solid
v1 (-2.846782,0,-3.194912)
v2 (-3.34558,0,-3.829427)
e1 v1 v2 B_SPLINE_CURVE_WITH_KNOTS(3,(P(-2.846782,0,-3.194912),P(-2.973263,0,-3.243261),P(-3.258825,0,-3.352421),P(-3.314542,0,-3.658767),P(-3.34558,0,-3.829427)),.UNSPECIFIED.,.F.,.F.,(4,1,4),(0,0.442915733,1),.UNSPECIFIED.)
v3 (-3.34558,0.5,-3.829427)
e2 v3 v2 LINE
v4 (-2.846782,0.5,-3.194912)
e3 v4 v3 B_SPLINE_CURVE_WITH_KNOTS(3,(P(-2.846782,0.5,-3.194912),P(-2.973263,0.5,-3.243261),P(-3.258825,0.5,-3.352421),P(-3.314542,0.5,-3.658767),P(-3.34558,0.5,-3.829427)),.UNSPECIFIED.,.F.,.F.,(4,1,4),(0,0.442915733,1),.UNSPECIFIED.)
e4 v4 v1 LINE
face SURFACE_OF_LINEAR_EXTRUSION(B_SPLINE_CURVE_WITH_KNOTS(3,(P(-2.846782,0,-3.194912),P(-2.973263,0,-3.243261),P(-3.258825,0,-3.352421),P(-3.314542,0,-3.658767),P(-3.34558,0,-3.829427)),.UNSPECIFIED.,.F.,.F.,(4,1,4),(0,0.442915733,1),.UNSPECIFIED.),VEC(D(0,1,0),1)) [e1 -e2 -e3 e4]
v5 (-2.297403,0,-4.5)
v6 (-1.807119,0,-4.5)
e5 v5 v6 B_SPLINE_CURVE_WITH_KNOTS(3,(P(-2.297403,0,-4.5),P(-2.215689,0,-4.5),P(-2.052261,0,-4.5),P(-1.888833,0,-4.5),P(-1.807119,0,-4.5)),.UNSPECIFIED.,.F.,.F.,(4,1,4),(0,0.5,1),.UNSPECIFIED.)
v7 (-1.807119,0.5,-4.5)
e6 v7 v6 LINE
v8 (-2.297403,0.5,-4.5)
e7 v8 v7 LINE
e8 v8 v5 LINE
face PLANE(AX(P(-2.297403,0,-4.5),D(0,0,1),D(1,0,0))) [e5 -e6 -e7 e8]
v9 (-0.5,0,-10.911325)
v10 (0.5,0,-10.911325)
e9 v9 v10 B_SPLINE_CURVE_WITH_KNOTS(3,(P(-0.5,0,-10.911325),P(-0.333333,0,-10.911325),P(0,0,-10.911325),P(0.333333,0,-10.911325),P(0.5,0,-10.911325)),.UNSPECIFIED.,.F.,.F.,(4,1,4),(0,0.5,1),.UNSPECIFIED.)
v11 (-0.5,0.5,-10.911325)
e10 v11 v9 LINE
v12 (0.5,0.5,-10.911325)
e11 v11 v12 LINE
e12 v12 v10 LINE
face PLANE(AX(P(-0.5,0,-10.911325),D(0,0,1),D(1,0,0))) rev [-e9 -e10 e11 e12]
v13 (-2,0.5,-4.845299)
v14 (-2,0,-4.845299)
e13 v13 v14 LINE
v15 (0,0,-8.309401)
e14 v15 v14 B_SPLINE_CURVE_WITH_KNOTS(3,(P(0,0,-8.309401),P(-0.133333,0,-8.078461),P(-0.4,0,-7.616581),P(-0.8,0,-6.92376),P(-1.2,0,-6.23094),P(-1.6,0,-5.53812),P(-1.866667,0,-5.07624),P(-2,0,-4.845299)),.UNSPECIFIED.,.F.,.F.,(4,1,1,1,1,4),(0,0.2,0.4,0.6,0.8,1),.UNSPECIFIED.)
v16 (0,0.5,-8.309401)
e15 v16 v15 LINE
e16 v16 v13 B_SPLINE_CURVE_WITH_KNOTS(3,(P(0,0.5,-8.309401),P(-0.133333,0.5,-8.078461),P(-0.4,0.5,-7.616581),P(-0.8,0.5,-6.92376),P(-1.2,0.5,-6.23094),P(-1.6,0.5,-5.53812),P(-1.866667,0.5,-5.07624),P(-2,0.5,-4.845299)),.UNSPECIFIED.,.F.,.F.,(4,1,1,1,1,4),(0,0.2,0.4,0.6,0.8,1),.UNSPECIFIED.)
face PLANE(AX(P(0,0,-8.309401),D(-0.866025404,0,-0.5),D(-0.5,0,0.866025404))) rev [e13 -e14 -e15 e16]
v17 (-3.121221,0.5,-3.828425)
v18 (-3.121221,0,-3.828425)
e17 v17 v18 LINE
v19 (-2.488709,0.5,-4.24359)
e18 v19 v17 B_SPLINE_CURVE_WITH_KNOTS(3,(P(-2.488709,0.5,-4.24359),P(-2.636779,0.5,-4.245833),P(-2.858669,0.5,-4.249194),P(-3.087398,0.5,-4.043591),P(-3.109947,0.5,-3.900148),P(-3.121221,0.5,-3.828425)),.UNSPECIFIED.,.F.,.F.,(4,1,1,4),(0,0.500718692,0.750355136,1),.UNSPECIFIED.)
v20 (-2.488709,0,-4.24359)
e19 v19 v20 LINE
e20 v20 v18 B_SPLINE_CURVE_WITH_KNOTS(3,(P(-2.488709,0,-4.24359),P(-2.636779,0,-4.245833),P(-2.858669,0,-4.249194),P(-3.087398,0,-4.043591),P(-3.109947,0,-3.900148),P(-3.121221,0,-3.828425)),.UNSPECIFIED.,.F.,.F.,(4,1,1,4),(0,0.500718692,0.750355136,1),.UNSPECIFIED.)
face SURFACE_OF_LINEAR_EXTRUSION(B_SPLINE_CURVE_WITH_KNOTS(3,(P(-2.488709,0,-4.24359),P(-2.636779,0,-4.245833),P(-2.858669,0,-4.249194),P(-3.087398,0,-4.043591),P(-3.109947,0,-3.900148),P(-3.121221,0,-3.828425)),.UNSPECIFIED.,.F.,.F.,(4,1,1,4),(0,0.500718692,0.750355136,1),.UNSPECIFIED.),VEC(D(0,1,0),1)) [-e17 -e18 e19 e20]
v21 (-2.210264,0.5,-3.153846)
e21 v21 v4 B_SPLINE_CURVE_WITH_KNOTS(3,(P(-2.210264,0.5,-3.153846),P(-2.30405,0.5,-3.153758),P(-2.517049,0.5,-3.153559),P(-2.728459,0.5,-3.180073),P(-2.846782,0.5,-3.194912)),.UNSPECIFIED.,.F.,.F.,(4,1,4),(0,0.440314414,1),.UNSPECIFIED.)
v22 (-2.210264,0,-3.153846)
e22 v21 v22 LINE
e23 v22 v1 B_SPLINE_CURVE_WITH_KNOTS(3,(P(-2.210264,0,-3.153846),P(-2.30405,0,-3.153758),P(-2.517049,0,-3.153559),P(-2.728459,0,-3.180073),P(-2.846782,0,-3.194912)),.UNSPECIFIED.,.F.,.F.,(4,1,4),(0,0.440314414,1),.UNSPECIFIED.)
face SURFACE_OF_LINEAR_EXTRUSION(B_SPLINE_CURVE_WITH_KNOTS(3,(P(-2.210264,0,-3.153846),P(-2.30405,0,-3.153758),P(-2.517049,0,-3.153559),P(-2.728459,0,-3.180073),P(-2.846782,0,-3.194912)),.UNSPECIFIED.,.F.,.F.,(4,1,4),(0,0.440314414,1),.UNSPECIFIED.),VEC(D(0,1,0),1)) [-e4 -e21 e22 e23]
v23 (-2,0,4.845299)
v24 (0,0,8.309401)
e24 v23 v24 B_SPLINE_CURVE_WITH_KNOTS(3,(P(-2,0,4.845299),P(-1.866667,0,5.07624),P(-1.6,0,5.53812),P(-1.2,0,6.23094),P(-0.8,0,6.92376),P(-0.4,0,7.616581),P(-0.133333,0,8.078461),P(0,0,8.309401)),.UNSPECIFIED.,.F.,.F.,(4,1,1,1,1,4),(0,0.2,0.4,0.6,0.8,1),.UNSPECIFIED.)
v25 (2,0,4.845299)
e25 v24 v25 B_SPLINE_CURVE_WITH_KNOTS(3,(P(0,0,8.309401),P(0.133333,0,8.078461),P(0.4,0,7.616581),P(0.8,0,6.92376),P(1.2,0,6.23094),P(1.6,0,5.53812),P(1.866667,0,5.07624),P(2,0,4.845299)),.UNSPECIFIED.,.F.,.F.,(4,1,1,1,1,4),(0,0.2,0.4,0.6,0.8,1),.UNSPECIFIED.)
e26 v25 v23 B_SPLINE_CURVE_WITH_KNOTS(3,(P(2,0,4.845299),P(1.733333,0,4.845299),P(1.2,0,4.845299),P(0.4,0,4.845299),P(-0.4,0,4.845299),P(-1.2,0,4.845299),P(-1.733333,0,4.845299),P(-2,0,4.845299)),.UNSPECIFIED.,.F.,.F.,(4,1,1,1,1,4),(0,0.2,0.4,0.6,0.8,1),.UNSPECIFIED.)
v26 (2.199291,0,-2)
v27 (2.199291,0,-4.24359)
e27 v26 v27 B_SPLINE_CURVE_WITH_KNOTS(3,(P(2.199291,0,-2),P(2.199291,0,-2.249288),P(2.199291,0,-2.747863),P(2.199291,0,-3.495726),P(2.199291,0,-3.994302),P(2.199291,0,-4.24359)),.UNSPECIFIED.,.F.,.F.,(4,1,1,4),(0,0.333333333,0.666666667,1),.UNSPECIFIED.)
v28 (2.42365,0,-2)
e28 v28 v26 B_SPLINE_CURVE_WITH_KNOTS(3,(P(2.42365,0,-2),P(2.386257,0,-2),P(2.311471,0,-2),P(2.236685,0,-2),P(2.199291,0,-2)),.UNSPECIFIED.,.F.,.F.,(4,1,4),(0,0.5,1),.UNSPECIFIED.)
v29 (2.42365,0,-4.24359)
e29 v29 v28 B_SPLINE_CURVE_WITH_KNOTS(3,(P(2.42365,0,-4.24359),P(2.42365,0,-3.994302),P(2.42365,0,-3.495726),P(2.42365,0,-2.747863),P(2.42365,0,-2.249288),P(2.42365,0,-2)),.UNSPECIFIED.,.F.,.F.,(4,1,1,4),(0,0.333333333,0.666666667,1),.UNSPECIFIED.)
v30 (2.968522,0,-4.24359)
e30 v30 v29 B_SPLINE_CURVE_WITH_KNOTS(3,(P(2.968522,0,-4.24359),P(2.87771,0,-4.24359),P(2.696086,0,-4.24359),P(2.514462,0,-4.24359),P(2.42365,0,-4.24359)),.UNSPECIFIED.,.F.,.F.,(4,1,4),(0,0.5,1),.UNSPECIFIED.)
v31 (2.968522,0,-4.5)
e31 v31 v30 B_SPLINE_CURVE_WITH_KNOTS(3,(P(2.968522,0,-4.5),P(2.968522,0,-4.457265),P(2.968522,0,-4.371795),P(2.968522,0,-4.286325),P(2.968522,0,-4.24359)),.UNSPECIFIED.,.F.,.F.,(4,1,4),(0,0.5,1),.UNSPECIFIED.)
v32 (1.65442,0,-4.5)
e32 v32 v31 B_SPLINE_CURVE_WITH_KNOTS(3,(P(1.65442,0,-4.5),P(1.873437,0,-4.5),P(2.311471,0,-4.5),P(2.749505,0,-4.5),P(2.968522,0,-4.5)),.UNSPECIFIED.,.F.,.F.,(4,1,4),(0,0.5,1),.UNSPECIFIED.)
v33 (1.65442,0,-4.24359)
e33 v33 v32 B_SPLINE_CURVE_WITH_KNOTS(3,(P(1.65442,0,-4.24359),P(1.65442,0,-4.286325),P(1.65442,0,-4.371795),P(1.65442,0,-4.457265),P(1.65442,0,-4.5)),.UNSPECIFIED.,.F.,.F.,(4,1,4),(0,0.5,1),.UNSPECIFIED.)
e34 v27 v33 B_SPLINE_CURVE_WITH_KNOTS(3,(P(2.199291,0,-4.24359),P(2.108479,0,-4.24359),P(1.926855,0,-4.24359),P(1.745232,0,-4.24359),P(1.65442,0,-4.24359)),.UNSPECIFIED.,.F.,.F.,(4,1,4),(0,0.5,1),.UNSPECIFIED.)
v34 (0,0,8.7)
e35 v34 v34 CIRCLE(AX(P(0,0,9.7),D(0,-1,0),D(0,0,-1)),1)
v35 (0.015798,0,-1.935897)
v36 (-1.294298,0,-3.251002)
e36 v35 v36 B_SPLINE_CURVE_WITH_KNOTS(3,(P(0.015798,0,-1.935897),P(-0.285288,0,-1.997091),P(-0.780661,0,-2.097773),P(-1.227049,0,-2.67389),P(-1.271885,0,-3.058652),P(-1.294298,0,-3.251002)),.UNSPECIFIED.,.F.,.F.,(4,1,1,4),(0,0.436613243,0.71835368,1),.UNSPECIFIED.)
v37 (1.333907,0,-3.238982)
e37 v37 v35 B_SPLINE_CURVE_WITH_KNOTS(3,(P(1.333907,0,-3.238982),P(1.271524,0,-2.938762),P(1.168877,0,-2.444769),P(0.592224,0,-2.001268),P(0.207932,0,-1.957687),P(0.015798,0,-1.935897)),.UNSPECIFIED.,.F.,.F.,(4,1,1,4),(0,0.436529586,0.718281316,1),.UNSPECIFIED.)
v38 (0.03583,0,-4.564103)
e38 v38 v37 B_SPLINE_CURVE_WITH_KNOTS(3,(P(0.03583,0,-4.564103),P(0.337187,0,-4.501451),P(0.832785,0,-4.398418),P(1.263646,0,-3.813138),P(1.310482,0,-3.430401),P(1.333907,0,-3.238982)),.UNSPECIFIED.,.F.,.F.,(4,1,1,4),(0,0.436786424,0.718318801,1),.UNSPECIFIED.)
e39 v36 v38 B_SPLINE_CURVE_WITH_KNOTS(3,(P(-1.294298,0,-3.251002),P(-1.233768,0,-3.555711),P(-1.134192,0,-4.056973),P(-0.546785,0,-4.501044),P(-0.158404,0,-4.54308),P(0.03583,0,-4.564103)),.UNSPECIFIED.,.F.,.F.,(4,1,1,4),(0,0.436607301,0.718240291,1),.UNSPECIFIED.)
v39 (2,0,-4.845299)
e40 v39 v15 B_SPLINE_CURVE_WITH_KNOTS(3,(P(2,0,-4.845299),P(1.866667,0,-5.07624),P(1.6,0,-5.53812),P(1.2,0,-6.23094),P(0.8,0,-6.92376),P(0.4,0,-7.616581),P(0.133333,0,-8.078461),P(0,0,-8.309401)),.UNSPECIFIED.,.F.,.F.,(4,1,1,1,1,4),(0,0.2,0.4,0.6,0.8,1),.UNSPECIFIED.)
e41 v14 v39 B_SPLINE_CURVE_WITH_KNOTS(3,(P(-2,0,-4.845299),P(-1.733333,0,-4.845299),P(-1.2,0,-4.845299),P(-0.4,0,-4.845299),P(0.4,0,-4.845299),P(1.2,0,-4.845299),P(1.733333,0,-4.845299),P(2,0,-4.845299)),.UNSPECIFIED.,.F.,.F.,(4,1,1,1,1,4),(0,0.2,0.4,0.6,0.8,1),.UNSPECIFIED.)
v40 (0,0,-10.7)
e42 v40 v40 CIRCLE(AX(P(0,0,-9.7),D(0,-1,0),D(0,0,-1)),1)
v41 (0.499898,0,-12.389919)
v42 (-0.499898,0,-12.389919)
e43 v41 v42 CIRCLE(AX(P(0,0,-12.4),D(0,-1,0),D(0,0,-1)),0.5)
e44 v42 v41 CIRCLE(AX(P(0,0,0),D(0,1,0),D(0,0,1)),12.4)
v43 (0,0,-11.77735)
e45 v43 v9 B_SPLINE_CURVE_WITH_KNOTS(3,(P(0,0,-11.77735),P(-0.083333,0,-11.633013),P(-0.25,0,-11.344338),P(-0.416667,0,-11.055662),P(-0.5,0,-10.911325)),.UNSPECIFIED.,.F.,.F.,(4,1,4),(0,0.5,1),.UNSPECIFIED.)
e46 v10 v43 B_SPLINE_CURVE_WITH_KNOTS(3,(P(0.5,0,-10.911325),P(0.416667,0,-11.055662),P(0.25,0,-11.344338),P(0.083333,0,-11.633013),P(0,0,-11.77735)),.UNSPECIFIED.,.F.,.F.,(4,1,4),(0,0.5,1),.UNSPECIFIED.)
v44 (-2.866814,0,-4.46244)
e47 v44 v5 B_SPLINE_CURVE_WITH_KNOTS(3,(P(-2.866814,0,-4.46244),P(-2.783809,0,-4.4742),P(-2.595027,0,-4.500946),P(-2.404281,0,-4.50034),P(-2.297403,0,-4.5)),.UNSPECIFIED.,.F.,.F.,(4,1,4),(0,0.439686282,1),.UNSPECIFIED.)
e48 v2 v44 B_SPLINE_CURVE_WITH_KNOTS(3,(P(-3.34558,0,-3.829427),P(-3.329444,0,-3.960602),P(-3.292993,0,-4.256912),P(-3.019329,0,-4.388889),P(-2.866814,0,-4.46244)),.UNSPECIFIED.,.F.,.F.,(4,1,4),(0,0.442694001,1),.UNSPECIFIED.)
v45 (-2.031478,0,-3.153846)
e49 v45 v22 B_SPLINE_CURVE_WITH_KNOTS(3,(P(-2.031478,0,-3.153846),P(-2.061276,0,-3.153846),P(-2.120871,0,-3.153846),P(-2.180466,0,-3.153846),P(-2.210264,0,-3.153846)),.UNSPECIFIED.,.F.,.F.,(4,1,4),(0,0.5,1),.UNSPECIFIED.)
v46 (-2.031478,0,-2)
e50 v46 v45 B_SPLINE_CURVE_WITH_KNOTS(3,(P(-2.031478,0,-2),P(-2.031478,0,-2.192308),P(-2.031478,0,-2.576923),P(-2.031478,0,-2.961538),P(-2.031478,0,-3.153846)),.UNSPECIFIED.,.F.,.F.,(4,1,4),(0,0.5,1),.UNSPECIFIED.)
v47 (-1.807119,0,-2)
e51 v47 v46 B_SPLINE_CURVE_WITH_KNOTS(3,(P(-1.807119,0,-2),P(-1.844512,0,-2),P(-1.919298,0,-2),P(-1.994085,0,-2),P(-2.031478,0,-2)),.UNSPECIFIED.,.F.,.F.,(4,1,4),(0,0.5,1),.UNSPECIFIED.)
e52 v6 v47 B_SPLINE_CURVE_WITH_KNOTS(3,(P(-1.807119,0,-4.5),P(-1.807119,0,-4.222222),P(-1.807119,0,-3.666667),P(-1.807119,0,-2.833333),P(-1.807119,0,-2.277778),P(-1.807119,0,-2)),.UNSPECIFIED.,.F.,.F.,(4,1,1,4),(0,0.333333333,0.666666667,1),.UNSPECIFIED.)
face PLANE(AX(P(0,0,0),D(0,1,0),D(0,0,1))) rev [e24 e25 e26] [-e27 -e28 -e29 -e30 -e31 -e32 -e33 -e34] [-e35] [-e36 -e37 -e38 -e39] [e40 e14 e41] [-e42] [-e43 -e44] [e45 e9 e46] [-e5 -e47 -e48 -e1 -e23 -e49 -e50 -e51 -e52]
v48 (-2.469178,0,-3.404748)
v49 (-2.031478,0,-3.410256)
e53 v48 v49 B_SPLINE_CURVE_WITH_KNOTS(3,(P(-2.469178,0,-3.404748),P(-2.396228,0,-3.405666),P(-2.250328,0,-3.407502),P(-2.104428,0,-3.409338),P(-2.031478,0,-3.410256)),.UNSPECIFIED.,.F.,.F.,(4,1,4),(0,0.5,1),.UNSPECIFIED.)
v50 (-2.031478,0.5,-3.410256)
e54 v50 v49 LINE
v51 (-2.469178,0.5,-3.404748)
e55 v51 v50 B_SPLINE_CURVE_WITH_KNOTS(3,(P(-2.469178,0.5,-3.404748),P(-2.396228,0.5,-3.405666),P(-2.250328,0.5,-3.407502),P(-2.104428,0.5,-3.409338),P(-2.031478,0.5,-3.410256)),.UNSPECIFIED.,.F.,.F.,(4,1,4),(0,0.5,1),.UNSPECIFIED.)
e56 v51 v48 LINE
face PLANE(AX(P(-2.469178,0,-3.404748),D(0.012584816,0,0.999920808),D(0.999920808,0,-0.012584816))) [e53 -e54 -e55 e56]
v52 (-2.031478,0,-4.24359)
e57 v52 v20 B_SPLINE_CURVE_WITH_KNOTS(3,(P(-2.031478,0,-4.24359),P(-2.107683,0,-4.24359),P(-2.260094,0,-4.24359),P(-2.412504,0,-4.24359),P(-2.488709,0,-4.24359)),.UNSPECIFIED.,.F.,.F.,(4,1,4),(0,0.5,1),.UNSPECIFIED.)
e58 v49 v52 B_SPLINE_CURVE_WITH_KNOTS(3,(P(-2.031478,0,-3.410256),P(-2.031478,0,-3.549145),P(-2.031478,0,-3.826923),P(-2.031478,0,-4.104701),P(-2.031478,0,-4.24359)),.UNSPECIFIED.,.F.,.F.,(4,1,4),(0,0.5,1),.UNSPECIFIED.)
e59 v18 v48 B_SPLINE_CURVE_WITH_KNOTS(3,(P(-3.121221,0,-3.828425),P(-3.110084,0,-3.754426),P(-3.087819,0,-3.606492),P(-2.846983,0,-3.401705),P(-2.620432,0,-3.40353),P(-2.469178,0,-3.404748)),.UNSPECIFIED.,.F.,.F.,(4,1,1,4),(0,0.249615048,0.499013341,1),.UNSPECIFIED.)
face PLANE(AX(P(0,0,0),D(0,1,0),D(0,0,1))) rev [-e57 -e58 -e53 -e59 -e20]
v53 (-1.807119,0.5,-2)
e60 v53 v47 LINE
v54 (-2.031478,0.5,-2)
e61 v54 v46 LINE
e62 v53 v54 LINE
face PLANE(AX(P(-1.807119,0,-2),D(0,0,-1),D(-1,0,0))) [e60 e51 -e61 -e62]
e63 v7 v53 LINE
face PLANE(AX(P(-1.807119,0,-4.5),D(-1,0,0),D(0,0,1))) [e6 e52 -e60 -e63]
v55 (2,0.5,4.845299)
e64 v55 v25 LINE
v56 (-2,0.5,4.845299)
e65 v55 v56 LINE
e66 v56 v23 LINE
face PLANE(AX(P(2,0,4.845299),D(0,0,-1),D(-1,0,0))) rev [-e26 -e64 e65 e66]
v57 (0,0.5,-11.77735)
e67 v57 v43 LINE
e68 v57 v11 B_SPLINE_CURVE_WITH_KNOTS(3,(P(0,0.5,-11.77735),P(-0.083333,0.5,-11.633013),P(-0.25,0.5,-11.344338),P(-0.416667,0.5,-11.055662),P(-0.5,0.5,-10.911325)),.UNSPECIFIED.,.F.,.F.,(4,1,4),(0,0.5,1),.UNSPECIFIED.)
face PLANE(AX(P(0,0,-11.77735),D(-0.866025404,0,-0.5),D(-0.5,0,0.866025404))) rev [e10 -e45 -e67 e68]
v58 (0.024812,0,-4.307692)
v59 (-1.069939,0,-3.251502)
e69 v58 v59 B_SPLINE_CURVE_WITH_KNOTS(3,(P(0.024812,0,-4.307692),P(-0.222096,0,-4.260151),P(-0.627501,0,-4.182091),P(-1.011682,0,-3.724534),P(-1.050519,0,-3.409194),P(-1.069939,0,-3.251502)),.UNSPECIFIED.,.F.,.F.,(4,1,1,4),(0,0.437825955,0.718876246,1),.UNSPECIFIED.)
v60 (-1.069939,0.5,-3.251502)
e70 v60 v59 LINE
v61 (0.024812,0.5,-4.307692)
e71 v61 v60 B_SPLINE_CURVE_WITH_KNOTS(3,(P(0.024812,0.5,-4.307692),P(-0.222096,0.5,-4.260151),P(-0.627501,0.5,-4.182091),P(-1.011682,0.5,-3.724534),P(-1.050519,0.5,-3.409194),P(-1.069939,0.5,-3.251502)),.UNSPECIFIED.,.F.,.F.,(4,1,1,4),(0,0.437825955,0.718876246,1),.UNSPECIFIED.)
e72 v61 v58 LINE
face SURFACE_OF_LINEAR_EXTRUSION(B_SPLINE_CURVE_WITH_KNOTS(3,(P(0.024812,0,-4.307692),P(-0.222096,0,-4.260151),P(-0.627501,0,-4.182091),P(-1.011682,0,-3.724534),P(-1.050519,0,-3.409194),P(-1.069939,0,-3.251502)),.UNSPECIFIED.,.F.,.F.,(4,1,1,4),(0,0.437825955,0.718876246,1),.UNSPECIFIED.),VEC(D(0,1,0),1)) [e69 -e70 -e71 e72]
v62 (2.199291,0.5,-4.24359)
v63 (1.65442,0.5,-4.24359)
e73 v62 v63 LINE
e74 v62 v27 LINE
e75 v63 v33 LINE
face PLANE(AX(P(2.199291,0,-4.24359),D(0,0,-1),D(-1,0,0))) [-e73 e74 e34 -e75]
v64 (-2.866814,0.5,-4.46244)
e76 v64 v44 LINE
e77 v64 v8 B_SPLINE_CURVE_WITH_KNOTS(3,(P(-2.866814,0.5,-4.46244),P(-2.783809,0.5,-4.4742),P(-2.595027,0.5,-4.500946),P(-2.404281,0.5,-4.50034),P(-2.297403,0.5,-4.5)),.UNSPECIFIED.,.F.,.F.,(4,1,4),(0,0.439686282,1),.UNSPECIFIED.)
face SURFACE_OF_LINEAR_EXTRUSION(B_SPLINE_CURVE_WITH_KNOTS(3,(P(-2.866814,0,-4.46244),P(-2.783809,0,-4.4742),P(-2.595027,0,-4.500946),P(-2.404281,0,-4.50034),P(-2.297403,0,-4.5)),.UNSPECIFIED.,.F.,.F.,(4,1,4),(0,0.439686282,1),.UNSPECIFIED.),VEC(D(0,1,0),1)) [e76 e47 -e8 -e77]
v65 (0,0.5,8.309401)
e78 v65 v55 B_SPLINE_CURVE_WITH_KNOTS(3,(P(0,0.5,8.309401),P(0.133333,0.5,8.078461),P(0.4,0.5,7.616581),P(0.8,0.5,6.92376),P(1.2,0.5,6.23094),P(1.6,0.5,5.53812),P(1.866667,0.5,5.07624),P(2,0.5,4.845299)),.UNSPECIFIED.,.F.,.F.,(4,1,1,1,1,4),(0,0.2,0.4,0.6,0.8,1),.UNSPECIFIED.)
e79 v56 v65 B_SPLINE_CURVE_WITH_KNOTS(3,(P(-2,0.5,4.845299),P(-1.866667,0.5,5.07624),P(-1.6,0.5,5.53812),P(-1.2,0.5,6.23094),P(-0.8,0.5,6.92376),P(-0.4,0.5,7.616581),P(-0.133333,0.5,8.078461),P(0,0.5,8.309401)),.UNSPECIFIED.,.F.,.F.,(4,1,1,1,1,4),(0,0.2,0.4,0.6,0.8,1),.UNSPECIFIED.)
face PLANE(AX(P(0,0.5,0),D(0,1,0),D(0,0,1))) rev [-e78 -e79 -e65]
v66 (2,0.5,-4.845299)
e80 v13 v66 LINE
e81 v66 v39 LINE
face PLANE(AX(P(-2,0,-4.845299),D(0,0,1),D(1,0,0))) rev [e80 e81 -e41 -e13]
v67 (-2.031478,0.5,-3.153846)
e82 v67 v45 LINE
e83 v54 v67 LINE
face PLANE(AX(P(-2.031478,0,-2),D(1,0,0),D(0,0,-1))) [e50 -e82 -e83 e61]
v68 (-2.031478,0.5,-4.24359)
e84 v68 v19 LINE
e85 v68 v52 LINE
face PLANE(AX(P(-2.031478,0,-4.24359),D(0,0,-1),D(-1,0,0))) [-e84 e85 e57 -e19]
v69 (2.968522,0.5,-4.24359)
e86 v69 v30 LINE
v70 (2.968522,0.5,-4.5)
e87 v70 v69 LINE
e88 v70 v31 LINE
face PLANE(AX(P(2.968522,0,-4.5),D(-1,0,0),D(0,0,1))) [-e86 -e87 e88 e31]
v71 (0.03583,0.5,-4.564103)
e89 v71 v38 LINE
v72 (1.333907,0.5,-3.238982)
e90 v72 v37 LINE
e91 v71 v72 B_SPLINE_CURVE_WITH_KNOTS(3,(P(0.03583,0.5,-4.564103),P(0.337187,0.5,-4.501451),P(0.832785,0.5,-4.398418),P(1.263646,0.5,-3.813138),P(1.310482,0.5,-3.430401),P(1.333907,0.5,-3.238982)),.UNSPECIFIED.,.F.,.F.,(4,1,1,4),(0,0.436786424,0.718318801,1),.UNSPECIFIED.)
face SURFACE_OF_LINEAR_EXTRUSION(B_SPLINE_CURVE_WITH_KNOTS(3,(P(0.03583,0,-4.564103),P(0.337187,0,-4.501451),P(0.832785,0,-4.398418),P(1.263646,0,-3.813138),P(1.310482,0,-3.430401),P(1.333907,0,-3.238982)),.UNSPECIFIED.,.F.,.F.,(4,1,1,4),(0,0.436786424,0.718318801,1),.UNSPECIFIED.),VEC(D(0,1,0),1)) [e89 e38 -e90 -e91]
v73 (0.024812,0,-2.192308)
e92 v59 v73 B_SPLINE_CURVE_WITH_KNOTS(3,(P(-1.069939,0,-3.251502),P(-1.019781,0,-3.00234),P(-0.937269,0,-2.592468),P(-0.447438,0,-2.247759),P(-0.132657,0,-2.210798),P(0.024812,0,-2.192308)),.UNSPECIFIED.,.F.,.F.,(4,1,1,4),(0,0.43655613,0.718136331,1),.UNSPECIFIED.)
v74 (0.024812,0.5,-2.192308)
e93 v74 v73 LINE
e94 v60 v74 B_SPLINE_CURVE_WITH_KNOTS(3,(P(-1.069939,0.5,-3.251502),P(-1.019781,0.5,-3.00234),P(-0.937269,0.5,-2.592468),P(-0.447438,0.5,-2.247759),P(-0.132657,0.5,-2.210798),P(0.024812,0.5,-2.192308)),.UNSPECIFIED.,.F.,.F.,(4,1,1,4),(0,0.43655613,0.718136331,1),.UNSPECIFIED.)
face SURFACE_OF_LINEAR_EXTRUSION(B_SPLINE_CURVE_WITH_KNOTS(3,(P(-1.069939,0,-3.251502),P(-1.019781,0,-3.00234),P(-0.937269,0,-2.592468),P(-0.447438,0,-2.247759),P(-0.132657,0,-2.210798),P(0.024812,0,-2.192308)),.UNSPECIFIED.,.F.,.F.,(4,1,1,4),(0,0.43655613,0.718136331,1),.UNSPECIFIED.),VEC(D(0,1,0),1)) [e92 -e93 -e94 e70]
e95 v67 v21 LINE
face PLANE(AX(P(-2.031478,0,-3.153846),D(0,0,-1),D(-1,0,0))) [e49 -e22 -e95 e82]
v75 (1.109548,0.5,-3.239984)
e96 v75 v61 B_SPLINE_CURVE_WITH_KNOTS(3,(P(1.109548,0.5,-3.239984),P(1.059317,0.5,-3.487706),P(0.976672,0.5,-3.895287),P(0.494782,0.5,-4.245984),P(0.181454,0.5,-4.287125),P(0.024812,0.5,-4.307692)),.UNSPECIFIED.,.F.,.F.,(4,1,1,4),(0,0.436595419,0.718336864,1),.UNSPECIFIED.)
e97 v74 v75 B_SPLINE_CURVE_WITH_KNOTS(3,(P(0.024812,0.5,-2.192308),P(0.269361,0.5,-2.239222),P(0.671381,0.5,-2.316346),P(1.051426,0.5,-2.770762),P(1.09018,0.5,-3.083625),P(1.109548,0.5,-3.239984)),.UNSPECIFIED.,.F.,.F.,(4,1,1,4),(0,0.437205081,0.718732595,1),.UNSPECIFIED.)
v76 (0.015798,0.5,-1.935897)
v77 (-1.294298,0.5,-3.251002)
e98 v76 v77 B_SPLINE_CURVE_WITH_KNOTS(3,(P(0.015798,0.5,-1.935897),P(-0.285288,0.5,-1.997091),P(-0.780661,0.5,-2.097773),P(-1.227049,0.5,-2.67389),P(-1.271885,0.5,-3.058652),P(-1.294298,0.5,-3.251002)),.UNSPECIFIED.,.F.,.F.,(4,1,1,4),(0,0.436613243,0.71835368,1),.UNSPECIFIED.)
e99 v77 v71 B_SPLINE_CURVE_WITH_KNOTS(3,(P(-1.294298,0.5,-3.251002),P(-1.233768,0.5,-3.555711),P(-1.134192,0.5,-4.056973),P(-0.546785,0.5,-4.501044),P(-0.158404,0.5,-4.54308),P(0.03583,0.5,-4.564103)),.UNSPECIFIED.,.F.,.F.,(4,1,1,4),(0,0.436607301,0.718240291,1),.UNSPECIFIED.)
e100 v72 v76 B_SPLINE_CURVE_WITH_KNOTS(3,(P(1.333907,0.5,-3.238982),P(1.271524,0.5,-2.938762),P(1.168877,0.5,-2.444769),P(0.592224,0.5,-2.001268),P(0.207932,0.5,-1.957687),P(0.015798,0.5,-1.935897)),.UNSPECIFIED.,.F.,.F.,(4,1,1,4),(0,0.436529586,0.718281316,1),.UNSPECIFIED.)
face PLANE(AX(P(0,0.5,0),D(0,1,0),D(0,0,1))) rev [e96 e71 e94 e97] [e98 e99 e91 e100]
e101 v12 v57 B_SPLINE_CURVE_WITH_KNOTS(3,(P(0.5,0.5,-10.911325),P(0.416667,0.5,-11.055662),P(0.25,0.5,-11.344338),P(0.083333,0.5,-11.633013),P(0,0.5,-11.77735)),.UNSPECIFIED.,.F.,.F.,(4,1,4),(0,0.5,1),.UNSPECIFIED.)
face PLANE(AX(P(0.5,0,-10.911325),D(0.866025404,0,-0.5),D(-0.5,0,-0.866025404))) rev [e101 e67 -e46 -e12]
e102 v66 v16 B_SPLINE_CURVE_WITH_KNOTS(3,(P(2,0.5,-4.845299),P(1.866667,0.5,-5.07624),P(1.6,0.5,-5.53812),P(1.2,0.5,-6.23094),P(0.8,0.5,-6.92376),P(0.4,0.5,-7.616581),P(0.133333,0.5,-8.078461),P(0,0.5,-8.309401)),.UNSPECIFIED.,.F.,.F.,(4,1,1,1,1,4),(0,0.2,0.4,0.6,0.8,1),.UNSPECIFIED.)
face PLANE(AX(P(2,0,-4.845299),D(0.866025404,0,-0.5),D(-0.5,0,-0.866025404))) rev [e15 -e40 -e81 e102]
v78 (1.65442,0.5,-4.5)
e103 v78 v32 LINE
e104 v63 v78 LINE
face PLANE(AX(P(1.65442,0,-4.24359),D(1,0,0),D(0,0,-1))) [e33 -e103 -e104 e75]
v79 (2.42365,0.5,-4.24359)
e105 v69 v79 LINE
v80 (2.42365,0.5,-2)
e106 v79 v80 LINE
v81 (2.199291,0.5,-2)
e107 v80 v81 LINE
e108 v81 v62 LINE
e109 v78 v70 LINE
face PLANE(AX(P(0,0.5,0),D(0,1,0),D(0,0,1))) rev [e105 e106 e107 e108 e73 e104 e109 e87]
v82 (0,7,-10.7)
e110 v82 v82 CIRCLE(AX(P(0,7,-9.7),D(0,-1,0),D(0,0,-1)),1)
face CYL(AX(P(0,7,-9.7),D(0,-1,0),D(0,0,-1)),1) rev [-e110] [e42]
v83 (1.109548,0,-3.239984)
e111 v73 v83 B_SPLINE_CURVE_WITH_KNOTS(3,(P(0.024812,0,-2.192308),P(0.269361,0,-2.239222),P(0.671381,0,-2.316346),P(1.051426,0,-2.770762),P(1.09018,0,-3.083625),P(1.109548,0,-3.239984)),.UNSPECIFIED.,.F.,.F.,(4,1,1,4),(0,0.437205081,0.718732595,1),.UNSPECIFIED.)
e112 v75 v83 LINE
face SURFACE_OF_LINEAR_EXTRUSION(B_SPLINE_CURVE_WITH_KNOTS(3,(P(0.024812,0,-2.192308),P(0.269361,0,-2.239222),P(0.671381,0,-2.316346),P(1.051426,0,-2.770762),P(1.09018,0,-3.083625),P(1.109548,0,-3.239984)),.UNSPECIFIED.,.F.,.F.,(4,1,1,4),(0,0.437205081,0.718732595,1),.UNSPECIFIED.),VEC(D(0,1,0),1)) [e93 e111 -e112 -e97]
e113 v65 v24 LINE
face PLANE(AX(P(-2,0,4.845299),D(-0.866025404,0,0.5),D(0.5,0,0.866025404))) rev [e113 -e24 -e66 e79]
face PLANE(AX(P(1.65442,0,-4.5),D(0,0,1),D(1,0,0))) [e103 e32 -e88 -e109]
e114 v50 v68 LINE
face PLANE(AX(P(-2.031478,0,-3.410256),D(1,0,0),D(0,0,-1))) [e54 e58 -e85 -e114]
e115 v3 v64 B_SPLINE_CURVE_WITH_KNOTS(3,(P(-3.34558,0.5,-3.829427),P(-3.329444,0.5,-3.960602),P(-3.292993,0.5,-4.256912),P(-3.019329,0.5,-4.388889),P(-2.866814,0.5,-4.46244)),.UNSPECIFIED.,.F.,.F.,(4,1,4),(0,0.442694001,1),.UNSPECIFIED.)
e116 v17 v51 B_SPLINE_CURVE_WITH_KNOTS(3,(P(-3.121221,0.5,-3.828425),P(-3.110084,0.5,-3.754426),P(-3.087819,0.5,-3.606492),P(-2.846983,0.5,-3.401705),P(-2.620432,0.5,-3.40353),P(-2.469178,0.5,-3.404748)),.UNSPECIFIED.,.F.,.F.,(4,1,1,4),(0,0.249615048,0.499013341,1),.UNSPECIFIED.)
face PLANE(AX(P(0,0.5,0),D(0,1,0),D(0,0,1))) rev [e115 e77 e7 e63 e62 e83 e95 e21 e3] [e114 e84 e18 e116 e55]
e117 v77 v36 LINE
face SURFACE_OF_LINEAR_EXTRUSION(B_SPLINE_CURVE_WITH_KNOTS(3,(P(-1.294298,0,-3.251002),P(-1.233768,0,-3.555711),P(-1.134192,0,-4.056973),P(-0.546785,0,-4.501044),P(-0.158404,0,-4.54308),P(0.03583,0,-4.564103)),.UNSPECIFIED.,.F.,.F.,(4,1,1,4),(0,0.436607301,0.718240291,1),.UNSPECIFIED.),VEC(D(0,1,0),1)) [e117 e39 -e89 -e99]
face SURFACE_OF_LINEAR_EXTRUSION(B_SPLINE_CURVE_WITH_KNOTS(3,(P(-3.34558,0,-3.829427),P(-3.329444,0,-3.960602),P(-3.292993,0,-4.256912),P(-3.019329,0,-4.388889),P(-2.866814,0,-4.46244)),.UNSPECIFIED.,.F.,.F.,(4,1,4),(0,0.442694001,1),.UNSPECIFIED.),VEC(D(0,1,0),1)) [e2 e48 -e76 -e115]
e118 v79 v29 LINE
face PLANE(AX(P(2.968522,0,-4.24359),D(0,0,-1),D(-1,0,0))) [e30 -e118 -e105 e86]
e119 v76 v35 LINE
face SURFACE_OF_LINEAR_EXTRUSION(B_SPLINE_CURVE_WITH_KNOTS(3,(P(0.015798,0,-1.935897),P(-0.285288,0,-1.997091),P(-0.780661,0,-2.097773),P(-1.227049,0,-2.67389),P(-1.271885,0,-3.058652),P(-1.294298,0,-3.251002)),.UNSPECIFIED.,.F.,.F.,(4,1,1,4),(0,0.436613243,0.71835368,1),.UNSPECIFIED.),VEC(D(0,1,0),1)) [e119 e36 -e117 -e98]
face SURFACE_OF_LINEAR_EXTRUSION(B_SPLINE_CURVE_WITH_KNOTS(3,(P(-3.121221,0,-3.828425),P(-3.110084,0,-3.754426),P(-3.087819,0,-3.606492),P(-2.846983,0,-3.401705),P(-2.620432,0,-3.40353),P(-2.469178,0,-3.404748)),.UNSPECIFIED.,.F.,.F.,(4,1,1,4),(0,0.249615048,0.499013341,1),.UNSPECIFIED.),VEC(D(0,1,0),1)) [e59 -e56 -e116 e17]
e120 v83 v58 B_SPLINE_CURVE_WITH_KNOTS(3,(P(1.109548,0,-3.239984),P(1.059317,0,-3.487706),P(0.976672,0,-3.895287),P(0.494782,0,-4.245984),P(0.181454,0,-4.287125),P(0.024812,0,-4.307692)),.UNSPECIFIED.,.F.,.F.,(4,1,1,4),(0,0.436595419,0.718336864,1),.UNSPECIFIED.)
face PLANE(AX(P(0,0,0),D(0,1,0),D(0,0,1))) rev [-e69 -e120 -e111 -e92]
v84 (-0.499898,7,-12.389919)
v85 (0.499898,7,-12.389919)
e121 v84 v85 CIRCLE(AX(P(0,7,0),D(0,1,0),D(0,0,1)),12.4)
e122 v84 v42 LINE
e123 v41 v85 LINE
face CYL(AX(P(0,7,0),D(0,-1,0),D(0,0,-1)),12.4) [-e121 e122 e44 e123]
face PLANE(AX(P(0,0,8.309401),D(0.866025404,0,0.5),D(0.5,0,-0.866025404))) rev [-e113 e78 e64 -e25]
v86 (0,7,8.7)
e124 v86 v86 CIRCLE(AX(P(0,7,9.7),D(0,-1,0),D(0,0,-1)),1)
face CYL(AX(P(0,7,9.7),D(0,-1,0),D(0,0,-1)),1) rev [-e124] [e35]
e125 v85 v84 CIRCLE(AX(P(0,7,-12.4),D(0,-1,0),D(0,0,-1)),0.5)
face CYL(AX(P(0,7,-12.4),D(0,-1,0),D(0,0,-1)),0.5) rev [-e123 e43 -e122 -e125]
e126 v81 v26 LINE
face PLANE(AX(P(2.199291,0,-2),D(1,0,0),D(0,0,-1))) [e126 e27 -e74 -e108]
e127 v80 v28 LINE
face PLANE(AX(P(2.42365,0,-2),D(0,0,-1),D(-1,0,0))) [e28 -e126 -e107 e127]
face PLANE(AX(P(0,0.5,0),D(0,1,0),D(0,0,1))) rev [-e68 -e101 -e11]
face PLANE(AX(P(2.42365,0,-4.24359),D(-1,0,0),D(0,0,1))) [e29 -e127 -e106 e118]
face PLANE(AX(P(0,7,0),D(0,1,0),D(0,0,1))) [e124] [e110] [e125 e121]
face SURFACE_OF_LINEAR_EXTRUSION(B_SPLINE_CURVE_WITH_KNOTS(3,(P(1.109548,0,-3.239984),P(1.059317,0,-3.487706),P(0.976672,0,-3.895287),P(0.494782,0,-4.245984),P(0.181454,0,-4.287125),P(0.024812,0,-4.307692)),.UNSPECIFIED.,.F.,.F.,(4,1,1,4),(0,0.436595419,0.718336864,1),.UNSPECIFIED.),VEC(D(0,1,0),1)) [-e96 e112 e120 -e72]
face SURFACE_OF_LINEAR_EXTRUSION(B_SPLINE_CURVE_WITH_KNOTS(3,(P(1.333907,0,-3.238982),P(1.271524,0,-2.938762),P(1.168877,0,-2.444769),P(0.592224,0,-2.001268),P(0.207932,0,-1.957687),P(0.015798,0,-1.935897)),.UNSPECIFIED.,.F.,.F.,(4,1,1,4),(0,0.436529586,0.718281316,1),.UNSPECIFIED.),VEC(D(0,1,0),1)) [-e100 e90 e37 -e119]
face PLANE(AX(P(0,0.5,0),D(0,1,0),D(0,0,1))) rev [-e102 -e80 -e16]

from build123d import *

# Parameters (mm, degrees)
SKETCH1_R           = 12.4
BOSS_EXTRUDE1_DEPTH = 7
SKETCH2_R           = 1
CUT_EXTRUDE1_DEPTH  = 19.881737208
WRAP1_START         = -0.5
WRAP1_DEPTH         = 0.5
SKETCH4_R           = 0.5
CUT_EXTRUDE2_DEPTH  = 7


# Read off the part's stored shape, not the designer's step: Wrap1
with BuildPart() as part:
    # Sketch1 → Boss-Extrude1 (new body)
    with BuildSketch(Plane(origin=(0, 0, 0), x_dir=(1, 0, 0), z_dir=(0, 1, 0))):
        with Locations(Location((0, 0, 0), (0, 0, 270))):
            Circle(SKETCH1_R)
    extrude(amount=BOSS_EXTRUDE1_DEPTH)

    # Sketch2 → Cut-Extrude1 (cut, through all)
    with BuildSketch(Plane(origin=(0, 0, 0), x_dir=(-1, 0, 0), z_dir=(0, -1, 0))):
        with Locations(Location((0, 9.7, 0), (0, 0, 90))):
            Circle(SKETCH2_R)
        with Locations(Location((0, -9.7, 0), (0, 0, 90))):
            Circle(SKETCH2_R)
    extrude(amount=-CUT_EXTRUDE1_DEPTH, mode=Mode.SUBTRACT)

    # Wrap1 outline → Wrap1 (cut)
    # profile 1 of 6: a face of its own
    with BuildSketch(Plane.XZ.offset(WRAP1_START)):
        with BuildLine():
            Line((-2.031477868, -3.153846154), (-2.210263925, -3.153846154))
            add(Edge.make_bspline(
                [(-2.210263925, -3.153846154), (-2.304050451, -3.153758336), (-2.51704944, -3.153558894), (-2.728459302, -3.180072549), (-2.846782355, -3.194911859)],
                knots=[0, 0, 0, 0, 0.440314414, 1, 1, 1, 1], degree=3))
            add(Edge.make_bspline(
                [(-2.846782355, -3.194911859), (-2.973262529, -3.243260598), (-3.258825144, -3.352420729), (-3.314541645, -3.658766612), (-3.345580432, -3.829427083)],
                knots=[0, 0, 0, 0, 0.442915733, 1, 1, 1, 1], degree=3))
            add(Edge.make_bspline(
                [(-3.345580432, -3.829427083), (-3.329443977, -3.960601874), (-3.292993392, -4.25691217), (-3.019329137, -4.388888631), (-2.866814406, -4.462439904)],
                knots=[0, 0, 0, 0, 0.442694001, 1, 1, 1, 1], degree=3))
            add(Edge.make_bspline(
                [(-2.866814406, -4.462439904), (-2.783809352, -4.4741997), (-2.595026902, -4.500945579), (-2.404280932, -4.500339561), (-2.297403348, -4.5)],
                knots=[0, 0, 0, 0, 0.439686282, 1, 1, 1, 1], degree=3))
            Line((-2.297403348, -4.5), (-1.807118893, -4.5))
            Line((-1.807118893, -4.5), (-1.807118893, -2))
            Line((-1.807118893, -2), (-2.031477868, -2))
            Line((-2.031477868, -2), (-2.031477868, -3.153846154))
        make_face()
        with BuildLine():
            Line((-2.031477868, -4.243589744), (-2.488709438, -4.243589744))
            add(Edge.make_bspline(
                [(-2.488709438, -4.243589744), (-2.636778663, -4.245832648), (-2.858668728, -4.249193765), (-3.087398478, -4.043591474), (-3.109947004, -3.900148285), (-3.121221457, -3.828425481)],
                knots=[0, 0, 0, 0, 0.500718692, 0.750355136, 1, 1, 1, 1], degree=3))
            add(Edge.make_bspline(
                [(-3.121221457, -3.828425481), (-3.110084042, -3.754426269), (-3.087818883, -3.606492103), (-2.846982746, -3.401705038), (-2.620432253, -3.403529508), (-2.469178188, -3.404747596)],
                knots=[0, 0, 0, 0, 0.249615048, 0.499013341, 1, 1, 1, 1], degree=3))
            Line((-2.469178188, -3.404747596), (-2.031477868, -3.41025641))
            Line((-2.031477868, -3.41025641), (-2.031477868, -4.243589744))
        make_face(mode=Mode.SUBTRACT)
    # profile 2 of 6: a face of its own
    with BuildSketch(Plane.XZ.offset(WRAP1_START)):
        with BuildLine():
            add(Edge.make_bspline(
                [(-1.29429838, -3.251001603), (-1.233767931, -3.555711086), (-1.13419239, -4.056973037), (-0.546785242, -4.501043755), (-0.158404316, -4.54307981), (0.035829825, -4.564102564)],
                knots=[0, 0, 0, 0, 0.436607301, 0.718240291, 1, 1, 1, 1], degree=3))
            add(Edge.make_bspline(
                [(0.035829825, -4.564102564), (0.337186775, -4.501451173), (0.832784511, -4.398417587), (1.263646175, -3.813137767), (1.310482432, -3.430401214), (1.333906748, -3.238982372)],
                knots=[0, 0, 0, 0, 0.436786424, 0.718318801, 1, 1, 1, 1], degree=3))
            add(Edge.make_bspline(
                [(1.333906748, -3.238982372), (1.271523902, -2.938761966), (1.168876948, -2.444768626), (0.592223534, -2.001267596), (0.207932181, -1.957686637), (0.015797773, -1.935897436)],
                knots=[0, 0, 0, 0, 0.436529586, 0.718281316, 1, 1, 1, 1], degree=3))
            add(Edge.make_bspline(
                [(0.015797773, -1.935897436), (-0.285288336, -1.99709136), (-0.780661114, -2.09777287), (-1.227049335, -2.673889596), (-1.271884529, -3.058652359), (-1.29429838, -3.251001603)],
                knots=[0, 0, 0, 0, 0.436613243, 0.71835368, 1, 1, 1, 1], degree=3))
        make_face()
        with BuildLine():
            add(Edge.make_bspline(
                [(0.024812197, -4.307692308), (-0.222096477, -4.260150518), (-0.627501361, -4.182090587), (-1.011681906, -3.724534497), (-1.050518548, -3.409193504), (-1.069939406, -3.251502404)],
                knots=[0, 0, 0, 0, 0.437825955, 0.718876246, 1, 1, 1, 1], degree=3))
            add(Edge.make_bspline(
                [(-1.069939406, -3.251502404), (-1.019780636, -3.002340488), (-0.937269286, -2.592468281), (-0.447437557, -2.247759346), (-0.132657177, -2.210797775), (0.024812197, -2.192307692)],
                knots=[0, 0, 0, 0, 0.43655613, 0.718136331, 1, 1, 1, 1], degree=3))
            add(Edge.make_bspline(
                [(0.024812197, -2.192307692), (0.269360953, -2.239222325), (0.671380896, -2.316346488), (1.051425571, -2.770762078), (1.090179676, -3.083624875), (1.109547773, -3.239983974)],
                knots=[0, 0, 0, 0, 0.437205081, 0.718732595, 1, 1, 1, 1], degree=3))
            add(Edge.make_bspline(
                [(1.109547773, -3.239983974), (1.059317235, -3.487706151), (0.97667219, -3.89528709), (0.494781539, -4.245984232), (0.181454127, -4.287124855), (0.024812197, -4.307692308)],
                knots=[0, 0, 0, 0, 0.436595419, 0.718336864, 1, 1, 1, 1], degree=3))
        make_face(mode=Mode.SUBTRACT)
    # profile 3 of 6: a face of its own
    with BuildSketch(Plane.XZ.offset(WRAP1_START)):
        Polygon((1.654419568, -4.5), (2.968522132, -4.5), (2.968522132, -4.243589744), (2.423650338, -4.243589744), (2.423650338, -2), (2.199291363, -2), (2.199291363, -4.243589744), (1.654419568, -4.243589744), align=None)
    # profile 4 of 6: a face of its own
    with BuildSketch(Plane.XZ.offset(WRAP1_START)):
        Polygon((0, -8.309401077), (2, -4.845299462), (-2, -4.845299462), align=None)
    # profile 5 of 6: a face of its own
    with BuildSketch(Plane.XZ.offset(WRAP1_START)):
        Polygon((-2, 4.845299462), (2, 4.845299462), (0, 8.309401077), align=None)
    # profile 6 of 6: a face of its own
    with BuildSketch(Plane.XZ.offset(WRAP1_START)):
        Polygon((0, -11.777350269), (0.5, -10.911324865), (-0.5, -10.911324865), align=None)
    extrude(amount=WRAP1_DEPTH, mode=Mode.SUBTRACT)

    # Sketch4 → Cut-Extrude2 (cut)
    with BuildSketch(Plane(origin=(0, 0, 0), x_dir=(-1, 0, 0), z_dir=(0, -1, 0))):
        with Locations((0, 12.4)):
            Circle(SKETCH4_R)
    extrude(amount=-CUT_EXTRUDE2_DEPTH, mode=Mode.SUBTRACT)


solid = part.part
